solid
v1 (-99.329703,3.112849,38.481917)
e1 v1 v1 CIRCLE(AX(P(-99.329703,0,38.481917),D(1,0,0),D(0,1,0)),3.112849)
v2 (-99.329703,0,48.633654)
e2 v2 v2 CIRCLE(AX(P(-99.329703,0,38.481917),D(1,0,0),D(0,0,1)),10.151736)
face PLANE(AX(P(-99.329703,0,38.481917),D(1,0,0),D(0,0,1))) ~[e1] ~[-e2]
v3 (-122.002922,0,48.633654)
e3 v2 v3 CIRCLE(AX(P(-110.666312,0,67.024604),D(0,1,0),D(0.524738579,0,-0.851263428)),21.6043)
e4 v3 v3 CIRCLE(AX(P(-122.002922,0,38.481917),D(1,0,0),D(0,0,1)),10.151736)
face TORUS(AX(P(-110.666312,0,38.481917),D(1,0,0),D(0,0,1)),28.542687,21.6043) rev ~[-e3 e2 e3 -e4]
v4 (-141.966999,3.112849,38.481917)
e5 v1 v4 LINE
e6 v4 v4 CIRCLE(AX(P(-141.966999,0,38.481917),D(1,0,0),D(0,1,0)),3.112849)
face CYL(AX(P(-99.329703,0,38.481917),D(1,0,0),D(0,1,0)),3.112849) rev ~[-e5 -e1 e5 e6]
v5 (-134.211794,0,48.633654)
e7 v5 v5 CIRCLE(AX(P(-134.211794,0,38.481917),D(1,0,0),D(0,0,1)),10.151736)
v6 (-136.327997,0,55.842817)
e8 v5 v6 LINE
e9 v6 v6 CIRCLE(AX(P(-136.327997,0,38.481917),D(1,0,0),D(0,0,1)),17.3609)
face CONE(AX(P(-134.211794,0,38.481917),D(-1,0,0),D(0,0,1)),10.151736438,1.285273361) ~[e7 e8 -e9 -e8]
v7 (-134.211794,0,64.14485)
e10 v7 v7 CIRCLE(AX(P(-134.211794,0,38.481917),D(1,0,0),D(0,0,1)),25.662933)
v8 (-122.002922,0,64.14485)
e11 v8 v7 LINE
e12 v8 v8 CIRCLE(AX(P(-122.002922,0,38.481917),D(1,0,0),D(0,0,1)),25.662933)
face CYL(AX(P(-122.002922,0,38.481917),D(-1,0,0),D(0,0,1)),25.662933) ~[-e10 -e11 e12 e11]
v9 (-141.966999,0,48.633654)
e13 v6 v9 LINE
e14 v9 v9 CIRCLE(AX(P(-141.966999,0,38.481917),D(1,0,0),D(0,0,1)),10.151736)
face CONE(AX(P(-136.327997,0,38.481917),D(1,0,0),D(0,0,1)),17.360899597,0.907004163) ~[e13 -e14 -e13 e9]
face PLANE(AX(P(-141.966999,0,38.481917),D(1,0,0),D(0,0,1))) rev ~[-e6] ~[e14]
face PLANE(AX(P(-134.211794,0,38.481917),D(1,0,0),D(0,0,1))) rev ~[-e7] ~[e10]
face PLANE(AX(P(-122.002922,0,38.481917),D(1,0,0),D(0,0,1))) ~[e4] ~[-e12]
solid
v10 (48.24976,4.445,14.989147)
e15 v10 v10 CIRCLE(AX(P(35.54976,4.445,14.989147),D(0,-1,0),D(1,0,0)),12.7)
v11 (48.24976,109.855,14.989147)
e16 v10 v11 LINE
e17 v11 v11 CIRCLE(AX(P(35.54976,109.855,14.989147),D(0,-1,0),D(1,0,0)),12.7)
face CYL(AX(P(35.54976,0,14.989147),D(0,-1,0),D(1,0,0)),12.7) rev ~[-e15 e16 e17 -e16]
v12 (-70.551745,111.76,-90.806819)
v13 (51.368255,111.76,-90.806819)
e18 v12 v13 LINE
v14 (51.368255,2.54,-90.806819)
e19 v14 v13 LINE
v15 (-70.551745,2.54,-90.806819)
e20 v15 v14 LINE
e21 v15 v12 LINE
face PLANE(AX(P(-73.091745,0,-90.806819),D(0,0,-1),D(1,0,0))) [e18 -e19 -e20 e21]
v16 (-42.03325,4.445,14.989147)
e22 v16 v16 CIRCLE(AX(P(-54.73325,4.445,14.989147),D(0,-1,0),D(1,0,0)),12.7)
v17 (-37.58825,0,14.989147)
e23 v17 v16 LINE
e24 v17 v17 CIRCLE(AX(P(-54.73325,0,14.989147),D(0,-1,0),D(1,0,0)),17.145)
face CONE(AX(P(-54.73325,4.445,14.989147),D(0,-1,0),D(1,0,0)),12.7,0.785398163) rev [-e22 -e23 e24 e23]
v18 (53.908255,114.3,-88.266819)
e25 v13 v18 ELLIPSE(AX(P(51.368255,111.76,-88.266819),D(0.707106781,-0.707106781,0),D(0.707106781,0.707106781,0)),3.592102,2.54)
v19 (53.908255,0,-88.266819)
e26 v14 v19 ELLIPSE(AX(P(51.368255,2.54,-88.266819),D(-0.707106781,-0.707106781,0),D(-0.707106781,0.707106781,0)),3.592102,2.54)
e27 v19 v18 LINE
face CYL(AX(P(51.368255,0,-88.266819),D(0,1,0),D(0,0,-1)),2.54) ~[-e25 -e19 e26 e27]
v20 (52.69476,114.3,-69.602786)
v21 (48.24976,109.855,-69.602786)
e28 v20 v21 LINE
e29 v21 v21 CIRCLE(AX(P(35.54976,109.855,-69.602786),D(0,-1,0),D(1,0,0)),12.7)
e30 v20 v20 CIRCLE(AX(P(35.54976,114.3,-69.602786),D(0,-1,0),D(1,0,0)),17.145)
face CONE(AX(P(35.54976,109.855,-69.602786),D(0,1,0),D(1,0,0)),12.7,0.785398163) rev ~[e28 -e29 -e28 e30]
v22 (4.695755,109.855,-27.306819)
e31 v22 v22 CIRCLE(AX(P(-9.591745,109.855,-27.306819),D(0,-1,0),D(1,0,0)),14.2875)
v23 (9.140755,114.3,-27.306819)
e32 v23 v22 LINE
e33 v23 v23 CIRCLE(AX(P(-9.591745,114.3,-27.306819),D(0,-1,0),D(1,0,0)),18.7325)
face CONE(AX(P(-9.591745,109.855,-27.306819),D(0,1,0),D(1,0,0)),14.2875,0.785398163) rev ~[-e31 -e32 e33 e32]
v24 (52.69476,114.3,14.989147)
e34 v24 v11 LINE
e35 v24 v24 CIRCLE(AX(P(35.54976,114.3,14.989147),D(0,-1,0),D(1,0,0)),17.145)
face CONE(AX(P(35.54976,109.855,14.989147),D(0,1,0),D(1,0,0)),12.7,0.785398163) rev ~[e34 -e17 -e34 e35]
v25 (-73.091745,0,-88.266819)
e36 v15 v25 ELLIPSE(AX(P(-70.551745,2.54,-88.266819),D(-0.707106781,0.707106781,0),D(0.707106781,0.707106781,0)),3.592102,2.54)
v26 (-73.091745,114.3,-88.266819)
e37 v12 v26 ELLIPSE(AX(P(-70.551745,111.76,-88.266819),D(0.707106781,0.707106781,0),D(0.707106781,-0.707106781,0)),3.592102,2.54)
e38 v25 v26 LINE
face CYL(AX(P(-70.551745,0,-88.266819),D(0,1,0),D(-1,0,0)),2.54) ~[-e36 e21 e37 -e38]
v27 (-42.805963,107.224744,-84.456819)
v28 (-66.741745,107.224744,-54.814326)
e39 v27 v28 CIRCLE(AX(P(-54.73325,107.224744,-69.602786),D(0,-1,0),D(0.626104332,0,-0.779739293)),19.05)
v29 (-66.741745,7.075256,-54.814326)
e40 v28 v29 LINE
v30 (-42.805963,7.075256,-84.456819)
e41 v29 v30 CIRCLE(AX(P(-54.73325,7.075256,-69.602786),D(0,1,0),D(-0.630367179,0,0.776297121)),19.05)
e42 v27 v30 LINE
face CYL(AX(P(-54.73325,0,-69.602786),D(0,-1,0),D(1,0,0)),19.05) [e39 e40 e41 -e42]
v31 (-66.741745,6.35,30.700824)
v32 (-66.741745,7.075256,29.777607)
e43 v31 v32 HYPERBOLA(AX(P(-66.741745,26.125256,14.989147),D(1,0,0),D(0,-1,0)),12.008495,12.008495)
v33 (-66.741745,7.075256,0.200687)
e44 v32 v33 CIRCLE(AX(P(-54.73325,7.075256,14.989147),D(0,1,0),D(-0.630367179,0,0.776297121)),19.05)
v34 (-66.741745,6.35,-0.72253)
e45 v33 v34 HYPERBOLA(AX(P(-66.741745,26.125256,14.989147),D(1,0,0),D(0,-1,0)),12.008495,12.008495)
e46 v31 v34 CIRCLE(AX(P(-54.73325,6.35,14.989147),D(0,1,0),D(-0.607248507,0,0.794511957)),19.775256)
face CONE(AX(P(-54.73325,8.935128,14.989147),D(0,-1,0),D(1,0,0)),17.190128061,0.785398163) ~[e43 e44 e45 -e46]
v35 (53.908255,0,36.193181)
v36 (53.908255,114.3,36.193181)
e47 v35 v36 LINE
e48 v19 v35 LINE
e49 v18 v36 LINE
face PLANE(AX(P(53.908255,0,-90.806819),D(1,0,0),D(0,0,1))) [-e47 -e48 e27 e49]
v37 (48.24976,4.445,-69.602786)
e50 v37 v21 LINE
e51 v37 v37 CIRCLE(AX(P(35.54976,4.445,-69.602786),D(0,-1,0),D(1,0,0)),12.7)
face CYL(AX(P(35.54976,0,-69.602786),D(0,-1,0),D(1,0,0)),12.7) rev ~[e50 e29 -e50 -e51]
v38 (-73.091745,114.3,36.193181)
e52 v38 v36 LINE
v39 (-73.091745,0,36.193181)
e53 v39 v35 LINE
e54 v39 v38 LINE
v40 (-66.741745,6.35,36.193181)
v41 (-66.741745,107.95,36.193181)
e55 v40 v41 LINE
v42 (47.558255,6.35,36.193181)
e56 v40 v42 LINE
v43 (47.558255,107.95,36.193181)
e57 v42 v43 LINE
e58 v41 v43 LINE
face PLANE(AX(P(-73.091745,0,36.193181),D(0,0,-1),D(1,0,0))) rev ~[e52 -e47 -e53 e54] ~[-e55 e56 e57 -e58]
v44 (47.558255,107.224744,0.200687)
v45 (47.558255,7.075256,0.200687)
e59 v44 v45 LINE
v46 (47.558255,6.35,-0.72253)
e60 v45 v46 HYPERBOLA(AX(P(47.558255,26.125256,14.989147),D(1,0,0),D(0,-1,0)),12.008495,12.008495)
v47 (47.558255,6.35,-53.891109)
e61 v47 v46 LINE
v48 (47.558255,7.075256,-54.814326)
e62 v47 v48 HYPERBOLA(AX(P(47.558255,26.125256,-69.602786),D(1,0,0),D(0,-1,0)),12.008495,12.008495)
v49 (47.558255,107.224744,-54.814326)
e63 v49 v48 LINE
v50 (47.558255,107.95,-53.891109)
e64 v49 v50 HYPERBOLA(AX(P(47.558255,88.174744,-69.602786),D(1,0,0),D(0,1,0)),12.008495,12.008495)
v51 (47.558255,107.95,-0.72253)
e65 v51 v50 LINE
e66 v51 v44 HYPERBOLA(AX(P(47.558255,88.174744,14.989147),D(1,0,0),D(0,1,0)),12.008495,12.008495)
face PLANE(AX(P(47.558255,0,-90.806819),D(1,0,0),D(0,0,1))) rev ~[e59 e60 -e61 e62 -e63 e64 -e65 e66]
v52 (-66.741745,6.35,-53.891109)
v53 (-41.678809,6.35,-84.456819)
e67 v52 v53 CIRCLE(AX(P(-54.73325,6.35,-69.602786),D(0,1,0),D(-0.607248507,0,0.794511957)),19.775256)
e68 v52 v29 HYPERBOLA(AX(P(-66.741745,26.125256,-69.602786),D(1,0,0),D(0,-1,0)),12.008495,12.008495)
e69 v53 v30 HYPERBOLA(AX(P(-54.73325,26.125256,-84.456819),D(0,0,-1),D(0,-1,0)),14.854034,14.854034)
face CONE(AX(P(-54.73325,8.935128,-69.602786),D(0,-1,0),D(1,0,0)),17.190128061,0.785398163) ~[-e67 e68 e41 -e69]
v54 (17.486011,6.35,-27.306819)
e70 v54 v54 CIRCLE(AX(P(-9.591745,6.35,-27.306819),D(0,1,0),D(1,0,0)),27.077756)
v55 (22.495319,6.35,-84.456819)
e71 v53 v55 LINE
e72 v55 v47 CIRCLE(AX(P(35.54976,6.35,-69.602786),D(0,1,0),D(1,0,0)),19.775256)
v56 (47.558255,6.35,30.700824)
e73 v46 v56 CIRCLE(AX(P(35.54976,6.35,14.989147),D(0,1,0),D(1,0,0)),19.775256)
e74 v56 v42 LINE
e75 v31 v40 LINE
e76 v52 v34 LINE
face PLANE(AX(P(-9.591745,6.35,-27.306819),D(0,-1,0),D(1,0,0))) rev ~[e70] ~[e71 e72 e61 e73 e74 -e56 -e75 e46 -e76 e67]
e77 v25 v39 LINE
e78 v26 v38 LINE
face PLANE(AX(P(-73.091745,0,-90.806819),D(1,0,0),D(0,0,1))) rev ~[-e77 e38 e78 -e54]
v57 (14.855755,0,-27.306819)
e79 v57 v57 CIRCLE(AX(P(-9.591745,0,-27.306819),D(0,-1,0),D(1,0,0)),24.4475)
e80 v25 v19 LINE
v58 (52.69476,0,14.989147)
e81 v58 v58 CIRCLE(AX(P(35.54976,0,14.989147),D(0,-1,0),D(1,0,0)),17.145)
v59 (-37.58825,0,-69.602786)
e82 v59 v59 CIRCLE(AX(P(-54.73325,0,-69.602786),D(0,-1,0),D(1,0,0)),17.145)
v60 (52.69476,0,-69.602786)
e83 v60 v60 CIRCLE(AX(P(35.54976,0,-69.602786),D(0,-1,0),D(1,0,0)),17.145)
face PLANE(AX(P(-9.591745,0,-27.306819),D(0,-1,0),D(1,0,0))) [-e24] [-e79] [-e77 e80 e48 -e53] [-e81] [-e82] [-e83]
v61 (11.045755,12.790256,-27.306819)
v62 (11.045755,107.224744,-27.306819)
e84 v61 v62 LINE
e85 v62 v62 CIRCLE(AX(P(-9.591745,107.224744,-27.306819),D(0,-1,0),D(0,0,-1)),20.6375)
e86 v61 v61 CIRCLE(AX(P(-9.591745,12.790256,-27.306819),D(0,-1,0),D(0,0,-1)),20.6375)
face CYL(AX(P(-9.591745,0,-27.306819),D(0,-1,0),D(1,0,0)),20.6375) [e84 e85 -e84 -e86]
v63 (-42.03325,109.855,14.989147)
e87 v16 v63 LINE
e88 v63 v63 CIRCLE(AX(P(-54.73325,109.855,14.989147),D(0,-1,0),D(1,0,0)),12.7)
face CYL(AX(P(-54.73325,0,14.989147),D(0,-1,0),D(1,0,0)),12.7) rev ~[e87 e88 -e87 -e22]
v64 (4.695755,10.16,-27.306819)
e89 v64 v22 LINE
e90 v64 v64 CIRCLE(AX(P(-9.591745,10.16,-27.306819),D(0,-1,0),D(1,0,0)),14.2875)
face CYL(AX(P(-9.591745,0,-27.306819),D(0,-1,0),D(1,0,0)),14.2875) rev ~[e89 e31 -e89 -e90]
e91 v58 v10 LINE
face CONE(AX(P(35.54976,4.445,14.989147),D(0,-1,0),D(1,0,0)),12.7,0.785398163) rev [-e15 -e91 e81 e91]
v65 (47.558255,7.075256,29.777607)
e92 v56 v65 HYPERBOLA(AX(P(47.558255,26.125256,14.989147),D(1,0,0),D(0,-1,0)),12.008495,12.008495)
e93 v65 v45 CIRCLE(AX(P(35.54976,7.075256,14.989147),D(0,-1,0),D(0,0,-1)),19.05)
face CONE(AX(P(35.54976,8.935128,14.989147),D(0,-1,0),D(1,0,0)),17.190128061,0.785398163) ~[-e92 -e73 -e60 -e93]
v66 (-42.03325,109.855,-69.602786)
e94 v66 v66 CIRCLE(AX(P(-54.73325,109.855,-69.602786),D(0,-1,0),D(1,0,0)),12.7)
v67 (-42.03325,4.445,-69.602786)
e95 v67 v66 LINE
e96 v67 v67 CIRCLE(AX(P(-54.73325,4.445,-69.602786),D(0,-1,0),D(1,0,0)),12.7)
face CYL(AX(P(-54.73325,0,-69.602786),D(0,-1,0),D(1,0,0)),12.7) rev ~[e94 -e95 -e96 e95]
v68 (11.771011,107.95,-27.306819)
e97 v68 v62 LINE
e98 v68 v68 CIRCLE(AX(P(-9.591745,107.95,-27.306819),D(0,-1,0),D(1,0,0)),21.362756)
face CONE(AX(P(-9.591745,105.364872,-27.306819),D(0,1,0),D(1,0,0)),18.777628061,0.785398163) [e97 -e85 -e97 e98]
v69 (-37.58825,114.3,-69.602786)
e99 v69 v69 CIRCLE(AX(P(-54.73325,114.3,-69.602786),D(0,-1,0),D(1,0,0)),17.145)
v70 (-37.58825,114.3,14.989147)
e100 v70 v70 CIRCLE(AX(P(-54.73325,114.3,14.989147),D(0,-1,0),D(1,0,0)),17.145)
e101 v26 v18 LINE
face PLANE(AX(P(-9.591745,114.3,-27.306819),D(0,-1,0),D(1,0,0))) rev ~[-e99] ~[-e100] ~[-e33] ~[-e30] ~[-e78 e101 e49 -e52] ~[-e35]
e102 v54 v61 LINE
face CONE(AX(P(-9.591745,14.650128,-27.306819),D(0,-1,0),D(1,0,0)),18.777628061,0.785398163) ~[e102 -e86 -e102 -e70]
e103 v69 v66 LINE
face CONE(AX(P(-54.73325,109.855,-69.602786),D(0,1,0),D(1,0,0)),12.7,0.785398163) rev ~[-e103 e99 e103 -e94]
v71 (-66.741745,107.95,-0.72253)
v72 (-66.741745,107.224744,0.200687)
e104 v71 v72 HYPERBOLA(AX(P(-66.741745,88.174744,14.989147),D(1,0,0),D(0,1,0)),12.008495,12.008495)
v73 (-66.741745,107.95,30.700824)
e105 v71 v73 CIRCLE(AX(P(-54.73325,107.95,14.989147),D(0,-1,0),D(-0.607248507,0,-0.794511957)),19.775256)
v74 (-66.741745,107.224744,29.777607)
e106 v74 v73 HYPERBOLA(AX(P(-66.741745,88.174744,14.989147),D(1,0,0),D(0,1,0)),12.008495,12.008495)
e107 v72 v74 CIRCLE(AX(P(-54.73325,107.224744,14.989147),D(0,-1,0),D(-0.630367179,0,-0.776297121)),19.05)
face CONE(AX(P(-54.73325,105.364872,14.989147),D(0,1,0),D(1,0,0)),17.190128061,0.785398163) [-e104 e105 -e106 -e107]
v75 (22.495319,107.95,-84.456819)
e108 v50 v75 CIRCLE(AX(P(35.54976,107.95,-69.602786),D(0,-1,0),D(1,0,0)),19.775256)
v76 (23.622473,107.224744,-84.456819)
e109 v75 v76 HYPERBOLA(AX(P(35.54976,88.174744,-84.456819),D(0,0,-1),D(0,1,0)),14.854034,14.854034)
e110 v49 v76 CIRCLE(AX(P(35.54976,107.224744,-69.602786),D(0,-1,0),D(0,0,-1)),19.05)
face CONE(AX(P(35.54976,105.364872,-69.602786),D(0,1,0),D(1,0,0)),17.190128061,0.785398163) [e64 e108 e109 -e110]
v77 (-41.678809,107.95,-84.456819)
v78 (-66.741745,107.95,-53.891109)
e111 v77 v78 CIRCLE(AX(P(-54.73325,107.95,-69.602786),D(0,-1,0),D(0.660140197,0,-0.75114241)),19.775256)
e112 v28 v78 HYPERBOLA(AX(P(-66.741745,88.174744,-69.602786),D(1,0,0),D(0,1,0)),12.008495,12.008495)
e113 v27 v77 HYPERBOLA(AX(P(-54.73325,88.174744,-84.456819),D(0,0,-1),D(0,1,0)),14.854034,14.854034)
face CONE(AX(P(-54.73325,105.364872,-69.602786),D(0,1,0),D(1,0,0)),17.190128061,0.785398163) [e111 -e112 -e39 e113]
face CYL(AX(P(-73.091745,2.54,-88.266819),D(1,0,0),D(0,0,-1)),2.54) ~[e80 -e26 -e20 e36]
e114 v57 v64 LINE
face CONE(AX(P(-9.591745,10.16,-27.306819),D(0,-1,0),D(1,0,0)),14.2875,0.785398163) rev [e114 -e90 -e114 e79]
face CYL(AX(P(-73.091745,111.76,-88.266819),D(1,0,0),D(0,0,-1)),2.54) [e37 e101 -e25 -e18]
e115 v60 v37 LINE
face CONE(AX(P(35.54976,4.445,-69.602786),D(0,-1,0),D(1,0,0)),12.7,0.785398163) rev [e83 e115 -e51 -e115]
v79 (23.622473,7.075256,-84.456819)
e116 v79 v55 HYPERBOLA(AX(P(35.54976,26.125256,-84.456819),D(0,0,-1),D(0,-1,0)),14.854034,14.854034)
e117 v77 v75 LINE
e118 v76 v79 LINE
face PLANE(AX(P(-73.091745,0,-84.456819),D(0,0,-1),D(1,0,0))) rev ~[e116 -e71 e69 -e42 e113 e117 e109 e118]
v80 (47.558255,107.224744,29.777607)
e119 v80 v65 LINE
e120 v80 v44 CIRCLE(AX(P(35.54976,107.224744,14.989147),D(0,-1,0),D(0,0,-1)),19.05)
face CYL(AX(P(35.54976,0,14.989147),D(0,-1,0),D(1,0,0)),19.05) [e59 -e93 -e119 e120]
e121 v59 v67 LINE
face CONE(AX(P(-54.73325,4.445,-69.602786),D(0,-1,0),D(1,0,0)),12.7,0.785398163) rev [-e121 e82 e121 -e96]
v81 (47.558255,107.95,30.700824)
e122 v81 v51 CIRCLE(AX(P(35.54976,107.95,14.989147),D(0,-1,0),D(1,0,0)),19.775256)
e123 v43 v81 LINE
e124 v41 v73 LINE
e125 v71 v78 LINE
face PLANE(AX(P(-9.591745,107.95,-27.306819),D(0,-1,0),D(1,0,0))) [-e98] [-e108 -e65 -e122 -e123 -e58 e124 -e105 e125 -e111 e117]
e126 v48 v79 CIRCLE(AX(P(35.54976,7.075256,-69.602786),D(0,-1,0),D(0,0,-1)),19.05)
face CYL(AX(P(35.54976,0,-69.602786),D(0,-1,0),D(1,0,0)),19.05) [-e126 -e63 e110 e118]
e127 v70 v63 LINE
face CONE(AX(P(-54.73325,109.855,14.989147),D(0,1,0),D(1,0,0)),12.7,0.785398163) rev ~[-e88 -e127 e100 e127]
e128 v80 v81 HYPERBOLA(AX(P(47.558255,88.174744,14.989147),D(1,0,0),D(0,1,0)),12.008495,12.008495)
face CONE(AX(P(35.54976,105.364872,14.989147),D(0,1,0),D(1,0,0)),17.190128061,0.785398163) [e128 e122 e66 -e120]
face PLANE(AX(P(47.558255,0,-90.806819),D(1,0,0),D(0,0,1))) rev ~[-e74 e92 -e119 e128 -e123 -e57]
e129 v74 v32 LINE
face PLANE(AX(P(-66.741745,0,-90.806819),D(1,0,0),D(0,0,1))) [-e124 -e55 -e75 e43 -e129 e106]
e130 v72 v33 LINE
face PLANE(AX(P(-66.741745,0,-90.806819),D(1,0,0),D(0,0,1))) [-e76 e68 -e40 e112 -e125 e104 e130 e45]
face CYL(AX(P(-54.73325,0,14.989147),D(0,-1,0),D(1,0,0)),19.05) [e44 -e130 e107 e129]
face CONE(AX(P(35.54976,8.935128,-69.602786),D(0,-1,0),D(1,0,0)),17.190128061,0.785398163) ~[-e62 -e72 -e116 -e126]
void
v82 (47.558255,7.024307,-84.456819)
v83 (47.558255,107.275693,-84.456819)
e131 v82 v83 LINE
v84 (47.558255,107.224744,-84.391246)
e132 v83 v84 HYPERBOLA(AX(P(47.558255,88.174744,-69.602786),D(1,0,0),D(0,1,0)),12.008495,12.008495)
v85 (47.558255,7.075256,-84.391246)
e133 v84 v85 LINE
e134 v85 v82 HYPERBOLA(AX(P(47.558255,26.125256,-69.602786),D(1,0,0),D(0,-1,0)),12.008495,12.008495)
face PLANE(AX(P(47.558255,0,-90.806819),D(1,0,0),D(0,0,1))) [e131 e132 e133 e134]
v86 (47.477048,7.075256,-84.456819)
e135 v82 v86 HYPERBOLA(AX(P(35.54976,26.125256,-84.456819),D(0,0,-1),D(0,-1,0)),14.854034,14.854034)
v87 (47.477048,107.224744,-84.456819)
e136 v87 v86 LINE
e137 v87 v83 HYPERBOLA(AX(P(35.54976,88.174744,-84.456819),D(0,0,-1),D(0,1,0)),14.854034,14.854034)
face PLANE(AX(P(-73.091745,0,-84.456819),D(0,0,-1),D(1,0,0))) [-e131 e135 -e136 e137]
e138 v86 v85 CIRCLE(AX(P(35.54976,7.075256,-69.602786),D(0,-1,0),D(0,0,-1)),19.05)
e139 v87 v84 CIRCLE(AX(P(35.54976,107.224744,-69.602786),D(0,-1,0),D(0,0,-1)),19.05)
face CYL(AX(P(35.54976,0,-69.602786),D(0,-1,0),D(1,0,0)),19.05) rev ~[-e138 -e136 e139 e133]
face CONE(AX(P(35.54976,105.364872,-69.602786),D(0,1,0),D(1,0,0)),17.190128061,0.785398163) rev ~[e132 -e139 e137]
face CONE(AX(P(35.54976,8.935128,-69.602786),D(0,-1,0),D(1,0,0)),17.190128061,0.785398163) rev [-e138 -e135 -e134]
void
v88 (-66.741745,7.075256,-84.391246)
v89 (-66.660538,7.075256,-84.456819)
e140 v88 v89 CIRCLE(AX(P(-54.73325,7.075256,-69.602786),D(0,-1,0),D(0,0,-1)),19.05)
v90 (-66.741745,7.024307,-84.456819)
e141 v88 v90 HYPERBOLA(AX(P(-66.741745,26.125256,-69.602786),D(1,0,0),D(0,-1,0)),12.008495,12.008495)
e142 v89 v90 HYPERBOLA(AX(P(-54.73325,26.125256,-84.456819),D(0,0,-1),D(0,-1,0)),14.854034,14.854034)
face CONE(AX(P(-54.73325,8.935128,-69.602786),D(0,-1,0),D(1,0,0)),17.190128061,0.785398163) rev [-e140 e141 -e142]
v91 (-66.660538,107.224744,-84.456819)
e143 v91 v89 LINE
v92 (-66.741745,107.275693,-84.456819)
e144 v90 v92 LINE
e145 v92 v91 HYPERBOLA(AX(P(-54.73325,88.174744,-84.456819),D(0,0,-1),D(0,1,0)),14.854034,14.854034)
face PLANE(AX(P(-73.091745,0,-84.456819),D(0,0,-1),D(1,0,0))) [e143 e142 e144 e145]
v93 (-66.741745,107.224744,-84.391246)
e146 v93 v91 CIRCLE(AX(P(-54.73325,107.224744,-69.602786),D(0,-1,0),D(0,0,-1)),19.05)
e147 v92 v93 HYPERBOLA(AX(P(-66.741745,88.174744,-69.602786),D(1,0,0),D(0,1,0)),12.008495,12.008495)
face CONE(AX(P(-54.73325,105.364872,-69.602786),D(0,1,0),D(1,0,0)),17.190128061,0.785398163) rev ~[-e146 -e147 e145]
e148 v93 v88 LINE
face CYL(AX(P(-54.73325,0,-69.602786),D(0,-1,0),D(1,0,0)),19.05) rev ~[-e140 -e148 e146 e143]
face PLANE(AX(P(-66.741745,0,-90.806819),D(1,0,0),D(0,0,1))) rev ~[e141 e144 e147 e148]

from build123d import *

# Parameters (mm, degrees)
F0_W     = 127
F0_H     = 127
F0_R     = 12.7
F0_R_2   = 14.2875
F1_DEPTH = 114.3
F2_R     = 2.54
F3_SIZE  = 4.445
F4_SIZE  = 10.16
F5_T     = 6.35
F8_R     = 3.112849
F9_DEPTH = 42.638296021


# Not quite as in the source:
# - a shell that OpenCascade refuses in one call is made with other operations: the cavity is built on its own and cut out


with BuildPart() as f1:
    # F0 (on Front) → F1 (new body)
    with BuildSketch(Plane.XZ):
        with Locations((-9.5917450488, -27.3068194985)):
            Rectangle(F0_W, F0_H)
        with Locations((-54.7332502902, -69.6027859598)):
            Circle(F0_R, mode=Mode.SUBTRACT)
        with Locations((35.5497601926, -69.6027859598)):
            Circle(F0_R, mode=Mode.SUBTRACT)
        with Locations((-54.7332502902, 14.9891469628)):
            Circle(F0_R, mode=Mode.SUBTRACT)
        with Locations((-9.5917450488, -27.3068194985)):
            Circle(F0_R_2, mode=Mode.SUBTRACT)
        with Locations((35.5497601926, 14.9891469628)):
            Circle(F0_R, mode=Mode.SUBTRACT)
    extrude(amount=-F1_DEPTH)

    # F2
    f2_edges = [f1.edges().sort_by_distance(p)[0] for p in [
        (53.908255, 57.15, -90.806819),
        (-9.591745, 0, -90.806819),
        (-9.591745, 114.3, -90.806819),
        (-73.091745, 57.15, -90.806819),
    ]]
    fillet(f2_edges, radius=F2_R)

    # F3
    f3_edges = [f1.edges().sort_by_distance(p)[0] for p in [
        (-67.43325, 0, 14.989147),
        (-67.43325, 0, -69.602786),
        (22.84976, 0, -69.602786),
        (22.84976, 0, 14.989147),
        (22.84976, 114.3, 14.989147),
        (-67.43325, 114.3, 14.989147),
        (-23.879245, 114.3, -27.306819),
        (22.84976, 114.3, -69.602786),
        (-67.43325, 114.3, -69.602786),
    ]]
    chamfer(f3_edges, length=F3_SIZE)

    # F4
    f4_edges = [f1.edges().sort_by_distance(p)[0] for p in [
        (-23.879245, 0, -27.306819),
    ]]
    chamfer(f4_edges, length=F4_SIZE)

    # F5: shell of thickness 6.35, made by hand


with BuildPart() as f5_core1:
    # F5_t2: copy of F1
    add(f1.part)

    # the walls: a layer under each face that stays
    f5_faces = [f5_core1.faces().sort_by_distance(p)[0] for p in [
        (-51.9250783821, 0, -26.0368194985),
        (-28.9592450488, 5.08, -27.3068194985),
        (-69.6557502902, 2.2225, 14.9891469628),
        (-73.0917450488, 57.15, -26.0368194985),
        (53.9082549512, 57.15, -26.0368194985),
        (-69.6557502902, 2.2225, -69.6027859598),
        (20.6272601926, 2.2225, -69.6027859598),
        (20.6272601926, 2.2225, 14.9891469628),
        (-23.8792450488, 60.0075, -27.3068194985),
        (-67.4332502902, 57.15, 14.9891469628),
        (-51.9250783821, 114.3, -26.0368194985),
        (-9.5917450488, 57.15, -90.8068194985),
        (-67.4332502902, 57.15, -69.6027859598),
        (22.8497601926, 57.15, -69.6027859598),
        (22.8497601926, 57.15, 14.9891469628),
        (-26.1017450488, 112.0775, -27.3068194985),
        (-69.6557502902, 112.0775, 14.9891469628),
        (20.6272601926, 112.0775, 14.9891469628),
        (20.6272601926, 112.0775, -69.6027859598),
        (-69.6557502902, 112.0775, -69.6027859598),
    ]]
    thicken(f5_faces, amount=-F5_T, mode=Mode.SUBTRACT)


with BuildPart() as f1_1:
    add(f1.part)

    # what is left inside the walls is the cavity
    f5_cavity = [f5_core1.part.solids().sort_by_distance(p)[0] for p in [
        (-30.292745, 75.746581, -27.306819),
        (47.557589, 73.841581, -84.473493),
        (-66.741079, 73.841581, -84.473493),
    ]]
    add(f5_cavity, mode=Mode.SUBTRACT)


with BuildPart() as f7:
    # F6 (on Front) → F7 (revolve)
    with BuildSketch(Plane.XZ):
        with BuildLine():
            Line((-141.9669985771, 48.6336536705), (-141.9669985771, 38.4819172323))
            Line((-141.9669985771, 38.4819172323), (-99.3297025561, 38.4819172323))
            Line((-99.3297025561, 38.4819172323), (-99.3297025561, 48.6336536705))
            ThreePointArc((-99.3297025561, 48.6336536705), (-110.6663122773, 45.4203041339), (-122.0029219985, 48.6336536705))
            Line((-122.0029219985, 48.6336536705), (-122.0029219985, 64.1448497772))
            Line((-122.0029219985, 64.1448497772), (-134.2117935419, 64.1448497772))
            Line((-134.2117935419, 64.1448497772), (-134.2117935419, 48.6336536705))
            Line((-134.2117935419, 48.6336536705), (-136.32799685, 55.8428168297))
            Line((-136.32799685, 55.8428168297), (-141.9669985771, 48.6336536705))
        make_face()
    revolve(axis=Axis((-120.6483505666, 0, 38.4819172323), (1, 0, 0)))

    # F8 (on face) → F9 (cut, through all)
    with BuildSketch(Plane.YZ.offset(-99.3297025561)):
        with Locations((0, 38.4819172323)):
            Circle(F8_R)
    extrude(amount=-F9_DEPTH, mode=Mode.SUBTRACT)


solid = Compound([f1_1.part, f7.part])
